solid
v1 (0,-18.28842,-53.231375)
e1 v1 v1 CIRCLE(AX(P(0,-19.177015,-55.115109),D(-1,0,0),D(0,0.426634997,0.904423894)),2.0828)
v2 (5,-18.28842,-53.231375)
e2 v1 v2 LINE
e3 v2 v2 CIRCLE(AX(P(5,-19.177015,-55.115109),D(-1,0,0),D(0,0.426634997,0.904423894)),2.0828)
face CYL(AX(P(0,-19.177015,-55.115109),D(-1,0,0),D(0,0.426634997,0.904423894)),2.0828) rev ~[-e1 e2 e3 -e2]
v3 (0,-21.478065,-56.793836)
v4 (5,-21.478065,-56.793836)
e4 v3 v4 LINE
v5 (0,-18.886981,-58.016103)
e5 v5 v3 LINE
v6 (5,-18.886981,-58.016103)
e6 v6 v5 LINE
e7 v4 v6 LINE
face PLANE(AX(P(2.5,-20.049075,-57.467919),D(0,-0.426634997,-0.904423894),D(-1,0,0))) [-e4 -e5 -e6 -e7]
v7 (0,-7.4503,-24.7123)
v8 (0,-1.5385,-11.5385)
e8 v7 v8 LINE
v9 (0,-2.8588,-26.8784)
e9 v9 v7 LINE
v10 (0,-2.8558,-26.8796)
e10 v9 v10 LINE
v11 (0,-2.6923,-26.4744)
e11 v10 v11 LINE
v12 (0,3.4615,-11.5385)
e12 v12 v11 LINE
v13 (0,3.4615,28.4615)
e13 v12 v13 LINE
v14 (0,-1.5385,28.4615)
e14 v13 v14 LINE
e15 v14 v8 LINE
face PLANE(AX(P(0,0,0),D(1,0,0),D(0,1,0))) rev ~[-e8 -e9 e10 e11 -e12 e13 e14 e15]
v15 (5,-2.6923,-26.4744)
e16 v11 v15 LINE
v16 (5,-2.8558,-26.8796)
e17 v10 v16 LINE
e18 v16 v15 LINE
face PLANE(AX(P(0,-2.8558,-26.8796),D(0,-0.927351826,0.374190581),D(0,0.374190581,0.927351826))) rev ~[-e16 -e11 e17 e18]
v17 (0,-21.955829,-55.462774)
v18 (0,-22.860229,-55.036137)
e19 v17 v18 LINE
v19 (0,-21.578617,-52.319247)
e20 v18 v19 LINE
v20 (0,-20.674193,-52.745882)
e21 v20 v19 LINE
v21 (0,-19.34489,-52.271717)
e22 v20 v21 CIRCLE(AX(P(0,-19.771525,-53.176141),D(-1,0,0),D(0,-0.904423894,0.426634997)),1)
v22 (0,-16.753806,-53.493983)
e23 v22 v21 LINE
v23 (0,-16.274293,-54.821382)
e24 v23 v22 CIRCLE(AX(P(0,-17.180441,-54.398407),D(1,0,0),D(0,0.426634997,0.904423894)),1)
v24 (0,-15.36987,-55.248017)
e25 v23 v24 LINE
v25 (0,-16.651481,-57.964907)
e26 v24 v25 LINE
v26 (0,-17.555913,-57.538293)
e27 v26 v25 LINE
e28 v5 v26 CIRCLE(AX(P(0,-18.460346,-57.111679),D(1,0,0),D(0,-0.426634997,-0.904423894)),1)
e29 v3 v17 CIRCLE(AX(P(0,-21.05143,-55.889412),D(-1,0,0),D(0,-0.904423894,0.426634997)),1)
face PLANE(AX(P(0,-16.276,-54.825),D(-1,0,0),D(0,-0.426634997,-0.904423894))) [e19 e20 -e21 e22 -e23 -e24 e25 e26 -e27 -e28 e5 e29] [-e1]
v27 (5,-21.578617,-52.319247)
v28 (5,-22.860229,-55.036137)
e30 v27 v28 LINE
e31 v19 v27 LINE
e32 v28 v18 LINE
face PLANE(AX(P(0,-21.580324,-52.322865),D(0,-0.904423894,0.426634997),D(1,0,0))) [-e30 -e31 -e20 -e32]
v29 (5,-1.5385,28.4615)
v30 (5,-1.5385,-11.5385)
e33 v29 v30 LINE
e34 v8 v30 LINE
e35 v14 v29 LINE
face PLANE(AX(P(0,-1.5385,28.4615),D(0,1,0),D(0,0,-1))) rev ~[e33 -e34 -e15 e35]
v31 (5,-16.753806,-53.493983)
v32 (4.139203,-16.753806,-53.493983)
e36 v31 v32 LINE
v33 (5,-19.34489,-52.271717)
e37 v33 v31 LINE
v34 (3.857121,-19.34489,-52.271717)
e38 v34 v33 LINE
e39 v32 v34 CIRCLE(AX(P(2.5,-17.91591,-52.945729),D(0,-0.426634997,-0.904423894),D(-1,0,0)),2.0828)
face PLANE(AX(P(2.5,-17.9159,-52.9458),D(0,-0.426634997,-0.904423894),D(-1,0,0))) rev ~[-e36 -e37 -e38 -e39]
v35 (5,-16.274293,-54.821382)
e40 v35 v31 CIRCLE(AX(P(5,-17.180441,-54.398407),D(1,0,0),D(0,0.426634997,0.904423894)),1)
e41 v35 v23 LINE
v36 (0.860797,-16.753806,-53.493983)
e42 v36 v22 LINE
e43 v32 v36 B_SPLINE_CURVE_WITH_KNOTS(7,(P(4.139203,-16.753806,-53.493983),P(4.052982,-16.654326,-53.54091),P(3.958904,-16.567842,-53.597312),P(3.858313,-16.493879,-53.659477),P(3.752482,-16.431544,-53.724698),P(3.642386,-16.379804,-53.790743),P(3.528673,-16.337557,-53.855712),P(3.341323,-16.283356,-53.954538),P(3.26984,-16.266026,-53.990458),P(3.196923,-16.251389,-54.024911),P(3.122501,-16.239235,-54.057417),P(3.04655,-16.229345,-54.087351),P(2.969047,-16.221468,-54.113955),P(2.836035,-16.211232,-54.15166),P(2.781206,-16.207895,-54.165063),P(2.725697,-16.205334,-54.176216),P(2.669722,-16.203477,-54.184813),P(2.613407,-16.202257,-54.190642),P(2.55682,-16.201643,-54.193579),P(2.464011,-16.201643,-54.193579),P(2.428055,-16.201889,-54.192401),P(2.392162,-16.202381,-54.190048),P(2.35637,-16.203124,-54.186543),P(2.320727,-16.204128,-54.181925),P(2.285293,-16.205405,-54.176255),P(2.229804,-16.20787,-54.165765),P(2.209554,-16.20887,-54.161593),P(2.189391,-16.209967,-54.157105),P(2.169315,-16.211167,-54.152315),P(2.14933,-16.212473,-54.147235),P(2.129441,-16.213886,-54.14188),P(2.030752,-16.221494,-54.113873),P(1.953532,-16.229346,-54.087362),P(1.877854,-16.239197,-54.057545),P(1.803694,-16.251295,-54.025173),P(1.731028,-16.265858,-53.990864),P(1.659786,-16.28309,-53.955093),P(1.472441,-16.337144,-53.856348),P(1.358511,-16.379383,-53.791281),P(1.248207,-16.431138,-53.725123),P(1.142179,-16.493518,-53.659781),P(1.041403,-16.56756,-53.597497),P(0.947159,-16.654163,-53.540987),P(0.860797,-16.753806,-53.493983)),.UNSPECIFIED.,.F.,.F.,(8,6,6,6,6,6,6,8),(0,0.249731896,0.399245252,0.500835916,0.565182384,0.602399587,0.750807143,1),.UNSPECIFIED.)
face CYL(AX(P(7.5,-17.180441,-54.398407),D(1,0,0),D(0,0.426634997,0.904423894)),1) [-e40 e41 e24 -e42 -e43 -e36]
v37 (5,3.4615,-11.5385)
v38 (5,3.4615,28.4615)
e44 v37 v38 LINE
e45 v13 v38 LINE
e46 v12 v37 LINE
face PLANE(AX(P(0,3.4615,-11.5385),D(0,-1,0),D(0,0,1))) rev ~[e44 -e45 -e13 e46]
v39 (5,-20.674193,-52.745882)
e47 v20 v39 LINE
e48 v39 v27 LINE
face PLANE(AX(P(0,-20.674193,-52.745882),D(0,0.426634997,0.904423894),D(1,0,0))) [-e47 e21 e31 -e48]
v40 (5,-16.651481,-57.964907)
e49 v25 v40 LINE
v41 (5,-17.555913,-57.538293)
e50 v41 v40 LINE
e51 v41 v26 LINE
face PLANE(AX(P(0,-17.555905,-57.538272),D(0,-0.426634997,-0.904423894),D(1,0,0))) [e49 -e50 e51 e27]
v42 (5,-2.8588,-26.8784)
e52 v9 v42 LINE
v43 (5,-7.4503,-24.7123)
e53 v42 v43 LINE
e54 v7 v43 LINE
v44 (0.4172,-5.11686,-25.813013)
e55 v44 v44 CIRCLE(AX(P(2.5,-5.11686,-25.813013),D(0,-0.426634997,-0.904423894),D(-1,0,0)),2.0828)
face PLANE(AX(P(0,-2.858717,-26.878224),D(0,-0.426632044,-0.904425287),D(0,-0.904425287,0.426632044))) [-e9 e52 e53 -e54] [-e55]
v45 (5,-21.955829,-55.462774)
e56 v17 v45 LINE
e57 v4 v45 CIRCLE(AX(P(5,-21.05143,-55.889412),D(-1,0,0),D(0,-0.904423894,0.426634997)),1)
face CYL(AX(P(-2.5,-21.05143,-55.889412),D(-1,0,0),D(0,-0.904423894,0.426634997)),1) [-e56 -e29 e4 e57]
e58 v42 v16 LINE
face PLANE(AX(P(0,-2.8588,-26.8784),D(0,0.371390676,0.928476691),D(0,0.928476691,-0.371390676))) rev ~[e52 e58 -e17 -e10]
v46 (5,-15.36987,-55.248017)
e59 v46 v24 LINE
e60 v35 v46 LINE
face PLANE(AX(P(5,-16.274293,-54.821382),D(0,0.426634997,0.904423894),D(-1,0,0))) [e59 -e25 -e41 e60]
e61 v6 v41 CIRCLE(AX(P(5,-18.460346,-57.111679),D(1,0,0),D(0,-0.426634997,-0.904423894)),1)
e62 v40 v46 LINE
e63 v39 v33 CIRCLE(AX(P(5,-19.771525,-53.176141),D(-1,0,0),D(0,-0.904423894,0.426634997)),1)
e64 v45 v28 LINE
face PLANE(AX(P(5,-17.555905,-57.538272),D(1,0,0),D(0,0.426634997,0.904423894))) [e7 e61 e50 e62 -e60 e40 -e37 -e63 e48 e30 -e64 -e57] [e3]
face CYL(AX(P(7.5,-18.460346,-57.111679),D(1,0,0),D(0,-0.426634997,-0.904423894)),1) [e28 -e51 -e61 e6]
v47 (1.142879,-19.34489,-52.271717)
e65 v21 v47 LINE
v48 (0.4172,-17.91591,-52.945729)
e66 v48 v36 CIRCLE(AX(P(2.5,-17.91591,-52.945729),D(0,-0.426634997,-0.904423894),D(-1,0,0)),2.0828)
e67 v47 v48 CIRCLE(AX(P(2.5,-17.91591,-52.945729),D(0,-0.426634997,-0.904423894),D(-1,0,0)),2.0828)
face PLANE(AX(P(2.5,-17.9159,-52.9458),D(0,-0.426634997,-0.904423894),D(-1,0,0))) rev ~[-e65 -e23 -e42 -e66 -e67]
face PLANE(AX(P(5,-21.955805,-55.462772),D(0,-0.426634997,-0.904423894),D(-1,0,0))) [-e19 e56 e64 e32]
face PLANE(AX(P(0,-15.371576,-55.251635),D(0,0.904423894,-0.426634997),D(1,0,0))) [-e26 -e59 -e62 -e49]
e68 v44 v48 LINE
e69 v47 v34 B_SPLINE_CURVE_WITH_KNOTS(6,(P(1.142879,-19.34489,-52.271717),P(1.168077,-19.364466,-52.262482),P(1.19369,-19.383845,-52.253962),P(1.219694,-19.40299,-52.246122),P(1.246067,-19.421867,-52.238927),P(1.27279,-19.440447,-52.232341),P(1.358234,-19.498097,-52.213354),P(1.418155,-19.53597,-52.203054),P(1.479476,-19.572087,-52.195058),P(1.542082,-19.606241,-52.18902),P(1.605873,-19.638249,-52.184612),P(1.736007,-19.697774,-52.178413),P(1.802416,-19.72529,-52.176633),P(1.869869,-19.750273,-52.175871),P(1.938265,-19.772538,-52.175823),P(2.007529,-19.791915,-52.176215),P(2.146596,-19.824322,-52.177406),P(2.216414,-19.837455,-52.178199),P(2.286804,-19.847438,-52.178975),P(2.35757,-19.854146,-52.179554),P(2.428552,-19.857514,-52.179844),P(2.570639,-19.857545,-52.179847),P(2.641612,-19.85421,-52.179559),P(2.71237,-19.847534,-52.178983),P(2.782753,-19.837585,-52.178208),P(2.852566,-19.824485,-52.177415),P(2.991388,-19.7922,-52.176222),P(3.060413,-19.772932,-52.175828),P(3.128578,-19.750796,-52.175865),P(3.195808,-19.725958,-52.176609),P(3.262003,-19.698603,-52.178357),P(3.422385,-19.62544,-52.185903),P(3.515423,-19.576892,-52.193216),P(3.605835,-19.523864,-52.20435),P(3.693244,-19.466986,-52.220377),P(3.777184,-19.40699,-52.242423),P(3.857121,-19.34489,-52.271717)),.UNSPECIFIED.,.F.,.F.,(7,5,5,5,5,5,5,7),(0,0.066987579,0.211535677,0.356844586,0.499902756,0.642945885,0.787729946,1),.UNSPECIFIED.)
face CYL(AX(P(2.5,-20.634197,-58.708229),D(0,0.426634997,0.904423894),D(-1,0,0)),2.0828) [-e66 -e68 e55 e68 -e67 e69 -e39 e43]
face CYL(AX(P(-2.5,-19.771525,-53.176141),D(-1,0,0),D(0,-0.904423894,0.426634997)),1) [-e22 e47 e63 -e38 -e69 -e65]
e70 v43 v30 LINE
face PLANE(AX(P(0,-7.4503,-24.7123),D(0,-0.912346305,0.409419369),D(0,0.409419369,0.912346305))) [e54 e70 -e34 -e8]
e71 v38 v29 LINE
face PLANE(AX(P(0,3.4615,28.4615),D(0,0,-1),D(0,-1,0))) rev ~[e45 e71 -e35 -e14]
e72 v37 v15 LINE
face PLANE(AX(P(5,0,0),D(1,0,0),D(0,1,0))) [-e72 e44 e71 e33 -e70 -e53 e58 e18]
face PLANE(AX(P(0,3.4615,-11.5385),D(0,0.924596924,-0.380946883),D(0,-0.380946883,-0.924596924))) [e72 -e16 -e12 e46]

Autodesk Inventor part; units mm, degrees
ref_plane "YZ Plane" through (0, 0, 0) normal (1, 0, 0) x (0, 1, 0)
ref_plane "XZ Plane" through (0, 0, 0) normal (0, 1, 0) x (-1, 0, 0)
ref_plane "XY Plane" through (0, 0, 0) normal (0, 0, 1) x (1, 0, 0)
sketch "Sketch1" plane through (0, 0, 0) normal (1, 0, 0) x (0, 1, 0)
  line L0 (3.4615, 28.4615) -> (-1.5385, 28.4615)
  line L1 (-1.5385, 28.4615) -> (-1.5385, -11.5385)
  line L2 (-1.5385, -11.5385) -> (3.4615, -11.5385)
  line L3 (3.4615, -11.5385) -> (3.4615, 28.4615)
  line L4 (3.4615, -11.5385) -> (-2.6923, -26.4744)
  line L5 (-2.8588, -26.8784) -> (-2.8558, -26.8796)
  line L6 (-2.8558, -26.8796) -> (-2.6923, -26.4744)
  line L7 (-2.8558, -26.8796) -> (-7.4503, -24.7123)
  line L8 (-7.4503, -24.7123) -> (-1.5385, -11.5385)
  point P0 (0, 0)
  dimension "d0" = 5
  dimension "d1" = 5.08
  dimension "d21" = 40
extrude "Extrusion1" add sketch "Sketch1" along normal blind 5
sketch "Sketch2" plane through (5, -2.8558, -26.8796) normal (0, -0.426635, -0.9044239) x (-1, 0, 0)
  circle A0 centre (2.5, -2.5) radius 2.0828
  line L0 (5, -5.08) -> (5, 0) projected
  line L1 (5, 0) -> (0, 0) projected
  point P0 (5, -8.885)
  dimension "d4" = 4.1656
  dimension "d5" = 2.5
  dimension "d6" = 2.5
extrude "Extrusion2" add sketch "Sketch2" along normal blind 30
sketch "Sketch7" plane through (2.5, -17.9159, -52.9458) normal (0, -0.426635, -0.9044239) x (-1, 0, 0)
  line L0 (2.5, -2.58) -> (-2.5, -2.58) projected
  line L1 (-2.5, 2.2849) -> (2.5, 2.2849)
  line L2 (2.5, 2.2849) -> (2.5, -2.58)
  line L3 (2.5, -2.58) -> (-2.5, -2.58)
  line L4 (-2.5, -2.58) -> (-2.5, 2.2849)
  point P0 (2.5, -6.385)
extrude "Extrusion3" add sketch "Sketch7" along normal blind 5
sketch "Sketch8" plane through (0, -20.2493, -51.8451) normal (-1, 0, 0) x (0, 0.426635, 0.9044239)
  circle A0 centre (-2.5, 2.3649) radius 2.0828
  line L0 (-5, 0) -> (-5, 4.8649) projected
  line L1 (0, 4.8649) -> (-5, 4.8649) projected
  point P0 (55.529, -3.805)
  dimension "d13" = 4.1656
  dimension "d14" = 2.5
  dimension "d15" = 2.5
extrude "Extrusion4" cut sketch "Sketch8" against normal blind 15
thread "Thread1" size "8-32 UNC" class "2B" standard "ANSI Unified Screw Threads" full length
fillet "Fillet1" radius 1 4 edges at (2.5, -22.3825, -56.3672) (2.5, -17.9826, -58.4427) (2.5, -15.8494, -53.9206) (2.5, -20.2493, -51.8451)
sketch "Sketch9" plane through (0, -20.6759, -52.7495) normal (0, -0.9044239, 0.426635) x (1, 0, 0)
  line L0 (0, -3.5828) -> (0, 0.5828) projected
  line L1 (5, 0) -> (5, -3) projected
  line L2 (0, 0.004) -> (5, 0.004)
  line L3 (5, 0.004) -> (5, -3)
  line L4 (5, -3) -> (0, -3)
  line L5 (0, -3) -> (0, 0.004)
  point P0 (0, 56.529)
extrude "Extrusion5" add sketch "Sketch9" along normal blind 1
sketch "Sketch10" plane through (0, -16.276, -54.825) normal (0, 0.9044239, -0.426635) x (1, 0, 0)
  point P0 (0, -56.529)
sketch "Sketch11" plane through (0, -16.276, -54.825) normal (0, 0.9044239, -0.426635) x (1, 0, 0)
  line L0 (5, -0.004) -> (5, -1) projected
  line L1 (0, 0) -> (0, 3) projected
  line L2 (5, -0.004) -> (0, -0.004)
  line L3 (0, -0.004) -> (0, 3)
  line L4 (0, 3) -> (5, 3)
  line L5 (5, 3) -> (5, -0.004)
  point P0 (0, -56.529)
extrude "Extrusion6" add sketch "Sketch11" along normal blind 1
properties part number "Fingers IPT"
